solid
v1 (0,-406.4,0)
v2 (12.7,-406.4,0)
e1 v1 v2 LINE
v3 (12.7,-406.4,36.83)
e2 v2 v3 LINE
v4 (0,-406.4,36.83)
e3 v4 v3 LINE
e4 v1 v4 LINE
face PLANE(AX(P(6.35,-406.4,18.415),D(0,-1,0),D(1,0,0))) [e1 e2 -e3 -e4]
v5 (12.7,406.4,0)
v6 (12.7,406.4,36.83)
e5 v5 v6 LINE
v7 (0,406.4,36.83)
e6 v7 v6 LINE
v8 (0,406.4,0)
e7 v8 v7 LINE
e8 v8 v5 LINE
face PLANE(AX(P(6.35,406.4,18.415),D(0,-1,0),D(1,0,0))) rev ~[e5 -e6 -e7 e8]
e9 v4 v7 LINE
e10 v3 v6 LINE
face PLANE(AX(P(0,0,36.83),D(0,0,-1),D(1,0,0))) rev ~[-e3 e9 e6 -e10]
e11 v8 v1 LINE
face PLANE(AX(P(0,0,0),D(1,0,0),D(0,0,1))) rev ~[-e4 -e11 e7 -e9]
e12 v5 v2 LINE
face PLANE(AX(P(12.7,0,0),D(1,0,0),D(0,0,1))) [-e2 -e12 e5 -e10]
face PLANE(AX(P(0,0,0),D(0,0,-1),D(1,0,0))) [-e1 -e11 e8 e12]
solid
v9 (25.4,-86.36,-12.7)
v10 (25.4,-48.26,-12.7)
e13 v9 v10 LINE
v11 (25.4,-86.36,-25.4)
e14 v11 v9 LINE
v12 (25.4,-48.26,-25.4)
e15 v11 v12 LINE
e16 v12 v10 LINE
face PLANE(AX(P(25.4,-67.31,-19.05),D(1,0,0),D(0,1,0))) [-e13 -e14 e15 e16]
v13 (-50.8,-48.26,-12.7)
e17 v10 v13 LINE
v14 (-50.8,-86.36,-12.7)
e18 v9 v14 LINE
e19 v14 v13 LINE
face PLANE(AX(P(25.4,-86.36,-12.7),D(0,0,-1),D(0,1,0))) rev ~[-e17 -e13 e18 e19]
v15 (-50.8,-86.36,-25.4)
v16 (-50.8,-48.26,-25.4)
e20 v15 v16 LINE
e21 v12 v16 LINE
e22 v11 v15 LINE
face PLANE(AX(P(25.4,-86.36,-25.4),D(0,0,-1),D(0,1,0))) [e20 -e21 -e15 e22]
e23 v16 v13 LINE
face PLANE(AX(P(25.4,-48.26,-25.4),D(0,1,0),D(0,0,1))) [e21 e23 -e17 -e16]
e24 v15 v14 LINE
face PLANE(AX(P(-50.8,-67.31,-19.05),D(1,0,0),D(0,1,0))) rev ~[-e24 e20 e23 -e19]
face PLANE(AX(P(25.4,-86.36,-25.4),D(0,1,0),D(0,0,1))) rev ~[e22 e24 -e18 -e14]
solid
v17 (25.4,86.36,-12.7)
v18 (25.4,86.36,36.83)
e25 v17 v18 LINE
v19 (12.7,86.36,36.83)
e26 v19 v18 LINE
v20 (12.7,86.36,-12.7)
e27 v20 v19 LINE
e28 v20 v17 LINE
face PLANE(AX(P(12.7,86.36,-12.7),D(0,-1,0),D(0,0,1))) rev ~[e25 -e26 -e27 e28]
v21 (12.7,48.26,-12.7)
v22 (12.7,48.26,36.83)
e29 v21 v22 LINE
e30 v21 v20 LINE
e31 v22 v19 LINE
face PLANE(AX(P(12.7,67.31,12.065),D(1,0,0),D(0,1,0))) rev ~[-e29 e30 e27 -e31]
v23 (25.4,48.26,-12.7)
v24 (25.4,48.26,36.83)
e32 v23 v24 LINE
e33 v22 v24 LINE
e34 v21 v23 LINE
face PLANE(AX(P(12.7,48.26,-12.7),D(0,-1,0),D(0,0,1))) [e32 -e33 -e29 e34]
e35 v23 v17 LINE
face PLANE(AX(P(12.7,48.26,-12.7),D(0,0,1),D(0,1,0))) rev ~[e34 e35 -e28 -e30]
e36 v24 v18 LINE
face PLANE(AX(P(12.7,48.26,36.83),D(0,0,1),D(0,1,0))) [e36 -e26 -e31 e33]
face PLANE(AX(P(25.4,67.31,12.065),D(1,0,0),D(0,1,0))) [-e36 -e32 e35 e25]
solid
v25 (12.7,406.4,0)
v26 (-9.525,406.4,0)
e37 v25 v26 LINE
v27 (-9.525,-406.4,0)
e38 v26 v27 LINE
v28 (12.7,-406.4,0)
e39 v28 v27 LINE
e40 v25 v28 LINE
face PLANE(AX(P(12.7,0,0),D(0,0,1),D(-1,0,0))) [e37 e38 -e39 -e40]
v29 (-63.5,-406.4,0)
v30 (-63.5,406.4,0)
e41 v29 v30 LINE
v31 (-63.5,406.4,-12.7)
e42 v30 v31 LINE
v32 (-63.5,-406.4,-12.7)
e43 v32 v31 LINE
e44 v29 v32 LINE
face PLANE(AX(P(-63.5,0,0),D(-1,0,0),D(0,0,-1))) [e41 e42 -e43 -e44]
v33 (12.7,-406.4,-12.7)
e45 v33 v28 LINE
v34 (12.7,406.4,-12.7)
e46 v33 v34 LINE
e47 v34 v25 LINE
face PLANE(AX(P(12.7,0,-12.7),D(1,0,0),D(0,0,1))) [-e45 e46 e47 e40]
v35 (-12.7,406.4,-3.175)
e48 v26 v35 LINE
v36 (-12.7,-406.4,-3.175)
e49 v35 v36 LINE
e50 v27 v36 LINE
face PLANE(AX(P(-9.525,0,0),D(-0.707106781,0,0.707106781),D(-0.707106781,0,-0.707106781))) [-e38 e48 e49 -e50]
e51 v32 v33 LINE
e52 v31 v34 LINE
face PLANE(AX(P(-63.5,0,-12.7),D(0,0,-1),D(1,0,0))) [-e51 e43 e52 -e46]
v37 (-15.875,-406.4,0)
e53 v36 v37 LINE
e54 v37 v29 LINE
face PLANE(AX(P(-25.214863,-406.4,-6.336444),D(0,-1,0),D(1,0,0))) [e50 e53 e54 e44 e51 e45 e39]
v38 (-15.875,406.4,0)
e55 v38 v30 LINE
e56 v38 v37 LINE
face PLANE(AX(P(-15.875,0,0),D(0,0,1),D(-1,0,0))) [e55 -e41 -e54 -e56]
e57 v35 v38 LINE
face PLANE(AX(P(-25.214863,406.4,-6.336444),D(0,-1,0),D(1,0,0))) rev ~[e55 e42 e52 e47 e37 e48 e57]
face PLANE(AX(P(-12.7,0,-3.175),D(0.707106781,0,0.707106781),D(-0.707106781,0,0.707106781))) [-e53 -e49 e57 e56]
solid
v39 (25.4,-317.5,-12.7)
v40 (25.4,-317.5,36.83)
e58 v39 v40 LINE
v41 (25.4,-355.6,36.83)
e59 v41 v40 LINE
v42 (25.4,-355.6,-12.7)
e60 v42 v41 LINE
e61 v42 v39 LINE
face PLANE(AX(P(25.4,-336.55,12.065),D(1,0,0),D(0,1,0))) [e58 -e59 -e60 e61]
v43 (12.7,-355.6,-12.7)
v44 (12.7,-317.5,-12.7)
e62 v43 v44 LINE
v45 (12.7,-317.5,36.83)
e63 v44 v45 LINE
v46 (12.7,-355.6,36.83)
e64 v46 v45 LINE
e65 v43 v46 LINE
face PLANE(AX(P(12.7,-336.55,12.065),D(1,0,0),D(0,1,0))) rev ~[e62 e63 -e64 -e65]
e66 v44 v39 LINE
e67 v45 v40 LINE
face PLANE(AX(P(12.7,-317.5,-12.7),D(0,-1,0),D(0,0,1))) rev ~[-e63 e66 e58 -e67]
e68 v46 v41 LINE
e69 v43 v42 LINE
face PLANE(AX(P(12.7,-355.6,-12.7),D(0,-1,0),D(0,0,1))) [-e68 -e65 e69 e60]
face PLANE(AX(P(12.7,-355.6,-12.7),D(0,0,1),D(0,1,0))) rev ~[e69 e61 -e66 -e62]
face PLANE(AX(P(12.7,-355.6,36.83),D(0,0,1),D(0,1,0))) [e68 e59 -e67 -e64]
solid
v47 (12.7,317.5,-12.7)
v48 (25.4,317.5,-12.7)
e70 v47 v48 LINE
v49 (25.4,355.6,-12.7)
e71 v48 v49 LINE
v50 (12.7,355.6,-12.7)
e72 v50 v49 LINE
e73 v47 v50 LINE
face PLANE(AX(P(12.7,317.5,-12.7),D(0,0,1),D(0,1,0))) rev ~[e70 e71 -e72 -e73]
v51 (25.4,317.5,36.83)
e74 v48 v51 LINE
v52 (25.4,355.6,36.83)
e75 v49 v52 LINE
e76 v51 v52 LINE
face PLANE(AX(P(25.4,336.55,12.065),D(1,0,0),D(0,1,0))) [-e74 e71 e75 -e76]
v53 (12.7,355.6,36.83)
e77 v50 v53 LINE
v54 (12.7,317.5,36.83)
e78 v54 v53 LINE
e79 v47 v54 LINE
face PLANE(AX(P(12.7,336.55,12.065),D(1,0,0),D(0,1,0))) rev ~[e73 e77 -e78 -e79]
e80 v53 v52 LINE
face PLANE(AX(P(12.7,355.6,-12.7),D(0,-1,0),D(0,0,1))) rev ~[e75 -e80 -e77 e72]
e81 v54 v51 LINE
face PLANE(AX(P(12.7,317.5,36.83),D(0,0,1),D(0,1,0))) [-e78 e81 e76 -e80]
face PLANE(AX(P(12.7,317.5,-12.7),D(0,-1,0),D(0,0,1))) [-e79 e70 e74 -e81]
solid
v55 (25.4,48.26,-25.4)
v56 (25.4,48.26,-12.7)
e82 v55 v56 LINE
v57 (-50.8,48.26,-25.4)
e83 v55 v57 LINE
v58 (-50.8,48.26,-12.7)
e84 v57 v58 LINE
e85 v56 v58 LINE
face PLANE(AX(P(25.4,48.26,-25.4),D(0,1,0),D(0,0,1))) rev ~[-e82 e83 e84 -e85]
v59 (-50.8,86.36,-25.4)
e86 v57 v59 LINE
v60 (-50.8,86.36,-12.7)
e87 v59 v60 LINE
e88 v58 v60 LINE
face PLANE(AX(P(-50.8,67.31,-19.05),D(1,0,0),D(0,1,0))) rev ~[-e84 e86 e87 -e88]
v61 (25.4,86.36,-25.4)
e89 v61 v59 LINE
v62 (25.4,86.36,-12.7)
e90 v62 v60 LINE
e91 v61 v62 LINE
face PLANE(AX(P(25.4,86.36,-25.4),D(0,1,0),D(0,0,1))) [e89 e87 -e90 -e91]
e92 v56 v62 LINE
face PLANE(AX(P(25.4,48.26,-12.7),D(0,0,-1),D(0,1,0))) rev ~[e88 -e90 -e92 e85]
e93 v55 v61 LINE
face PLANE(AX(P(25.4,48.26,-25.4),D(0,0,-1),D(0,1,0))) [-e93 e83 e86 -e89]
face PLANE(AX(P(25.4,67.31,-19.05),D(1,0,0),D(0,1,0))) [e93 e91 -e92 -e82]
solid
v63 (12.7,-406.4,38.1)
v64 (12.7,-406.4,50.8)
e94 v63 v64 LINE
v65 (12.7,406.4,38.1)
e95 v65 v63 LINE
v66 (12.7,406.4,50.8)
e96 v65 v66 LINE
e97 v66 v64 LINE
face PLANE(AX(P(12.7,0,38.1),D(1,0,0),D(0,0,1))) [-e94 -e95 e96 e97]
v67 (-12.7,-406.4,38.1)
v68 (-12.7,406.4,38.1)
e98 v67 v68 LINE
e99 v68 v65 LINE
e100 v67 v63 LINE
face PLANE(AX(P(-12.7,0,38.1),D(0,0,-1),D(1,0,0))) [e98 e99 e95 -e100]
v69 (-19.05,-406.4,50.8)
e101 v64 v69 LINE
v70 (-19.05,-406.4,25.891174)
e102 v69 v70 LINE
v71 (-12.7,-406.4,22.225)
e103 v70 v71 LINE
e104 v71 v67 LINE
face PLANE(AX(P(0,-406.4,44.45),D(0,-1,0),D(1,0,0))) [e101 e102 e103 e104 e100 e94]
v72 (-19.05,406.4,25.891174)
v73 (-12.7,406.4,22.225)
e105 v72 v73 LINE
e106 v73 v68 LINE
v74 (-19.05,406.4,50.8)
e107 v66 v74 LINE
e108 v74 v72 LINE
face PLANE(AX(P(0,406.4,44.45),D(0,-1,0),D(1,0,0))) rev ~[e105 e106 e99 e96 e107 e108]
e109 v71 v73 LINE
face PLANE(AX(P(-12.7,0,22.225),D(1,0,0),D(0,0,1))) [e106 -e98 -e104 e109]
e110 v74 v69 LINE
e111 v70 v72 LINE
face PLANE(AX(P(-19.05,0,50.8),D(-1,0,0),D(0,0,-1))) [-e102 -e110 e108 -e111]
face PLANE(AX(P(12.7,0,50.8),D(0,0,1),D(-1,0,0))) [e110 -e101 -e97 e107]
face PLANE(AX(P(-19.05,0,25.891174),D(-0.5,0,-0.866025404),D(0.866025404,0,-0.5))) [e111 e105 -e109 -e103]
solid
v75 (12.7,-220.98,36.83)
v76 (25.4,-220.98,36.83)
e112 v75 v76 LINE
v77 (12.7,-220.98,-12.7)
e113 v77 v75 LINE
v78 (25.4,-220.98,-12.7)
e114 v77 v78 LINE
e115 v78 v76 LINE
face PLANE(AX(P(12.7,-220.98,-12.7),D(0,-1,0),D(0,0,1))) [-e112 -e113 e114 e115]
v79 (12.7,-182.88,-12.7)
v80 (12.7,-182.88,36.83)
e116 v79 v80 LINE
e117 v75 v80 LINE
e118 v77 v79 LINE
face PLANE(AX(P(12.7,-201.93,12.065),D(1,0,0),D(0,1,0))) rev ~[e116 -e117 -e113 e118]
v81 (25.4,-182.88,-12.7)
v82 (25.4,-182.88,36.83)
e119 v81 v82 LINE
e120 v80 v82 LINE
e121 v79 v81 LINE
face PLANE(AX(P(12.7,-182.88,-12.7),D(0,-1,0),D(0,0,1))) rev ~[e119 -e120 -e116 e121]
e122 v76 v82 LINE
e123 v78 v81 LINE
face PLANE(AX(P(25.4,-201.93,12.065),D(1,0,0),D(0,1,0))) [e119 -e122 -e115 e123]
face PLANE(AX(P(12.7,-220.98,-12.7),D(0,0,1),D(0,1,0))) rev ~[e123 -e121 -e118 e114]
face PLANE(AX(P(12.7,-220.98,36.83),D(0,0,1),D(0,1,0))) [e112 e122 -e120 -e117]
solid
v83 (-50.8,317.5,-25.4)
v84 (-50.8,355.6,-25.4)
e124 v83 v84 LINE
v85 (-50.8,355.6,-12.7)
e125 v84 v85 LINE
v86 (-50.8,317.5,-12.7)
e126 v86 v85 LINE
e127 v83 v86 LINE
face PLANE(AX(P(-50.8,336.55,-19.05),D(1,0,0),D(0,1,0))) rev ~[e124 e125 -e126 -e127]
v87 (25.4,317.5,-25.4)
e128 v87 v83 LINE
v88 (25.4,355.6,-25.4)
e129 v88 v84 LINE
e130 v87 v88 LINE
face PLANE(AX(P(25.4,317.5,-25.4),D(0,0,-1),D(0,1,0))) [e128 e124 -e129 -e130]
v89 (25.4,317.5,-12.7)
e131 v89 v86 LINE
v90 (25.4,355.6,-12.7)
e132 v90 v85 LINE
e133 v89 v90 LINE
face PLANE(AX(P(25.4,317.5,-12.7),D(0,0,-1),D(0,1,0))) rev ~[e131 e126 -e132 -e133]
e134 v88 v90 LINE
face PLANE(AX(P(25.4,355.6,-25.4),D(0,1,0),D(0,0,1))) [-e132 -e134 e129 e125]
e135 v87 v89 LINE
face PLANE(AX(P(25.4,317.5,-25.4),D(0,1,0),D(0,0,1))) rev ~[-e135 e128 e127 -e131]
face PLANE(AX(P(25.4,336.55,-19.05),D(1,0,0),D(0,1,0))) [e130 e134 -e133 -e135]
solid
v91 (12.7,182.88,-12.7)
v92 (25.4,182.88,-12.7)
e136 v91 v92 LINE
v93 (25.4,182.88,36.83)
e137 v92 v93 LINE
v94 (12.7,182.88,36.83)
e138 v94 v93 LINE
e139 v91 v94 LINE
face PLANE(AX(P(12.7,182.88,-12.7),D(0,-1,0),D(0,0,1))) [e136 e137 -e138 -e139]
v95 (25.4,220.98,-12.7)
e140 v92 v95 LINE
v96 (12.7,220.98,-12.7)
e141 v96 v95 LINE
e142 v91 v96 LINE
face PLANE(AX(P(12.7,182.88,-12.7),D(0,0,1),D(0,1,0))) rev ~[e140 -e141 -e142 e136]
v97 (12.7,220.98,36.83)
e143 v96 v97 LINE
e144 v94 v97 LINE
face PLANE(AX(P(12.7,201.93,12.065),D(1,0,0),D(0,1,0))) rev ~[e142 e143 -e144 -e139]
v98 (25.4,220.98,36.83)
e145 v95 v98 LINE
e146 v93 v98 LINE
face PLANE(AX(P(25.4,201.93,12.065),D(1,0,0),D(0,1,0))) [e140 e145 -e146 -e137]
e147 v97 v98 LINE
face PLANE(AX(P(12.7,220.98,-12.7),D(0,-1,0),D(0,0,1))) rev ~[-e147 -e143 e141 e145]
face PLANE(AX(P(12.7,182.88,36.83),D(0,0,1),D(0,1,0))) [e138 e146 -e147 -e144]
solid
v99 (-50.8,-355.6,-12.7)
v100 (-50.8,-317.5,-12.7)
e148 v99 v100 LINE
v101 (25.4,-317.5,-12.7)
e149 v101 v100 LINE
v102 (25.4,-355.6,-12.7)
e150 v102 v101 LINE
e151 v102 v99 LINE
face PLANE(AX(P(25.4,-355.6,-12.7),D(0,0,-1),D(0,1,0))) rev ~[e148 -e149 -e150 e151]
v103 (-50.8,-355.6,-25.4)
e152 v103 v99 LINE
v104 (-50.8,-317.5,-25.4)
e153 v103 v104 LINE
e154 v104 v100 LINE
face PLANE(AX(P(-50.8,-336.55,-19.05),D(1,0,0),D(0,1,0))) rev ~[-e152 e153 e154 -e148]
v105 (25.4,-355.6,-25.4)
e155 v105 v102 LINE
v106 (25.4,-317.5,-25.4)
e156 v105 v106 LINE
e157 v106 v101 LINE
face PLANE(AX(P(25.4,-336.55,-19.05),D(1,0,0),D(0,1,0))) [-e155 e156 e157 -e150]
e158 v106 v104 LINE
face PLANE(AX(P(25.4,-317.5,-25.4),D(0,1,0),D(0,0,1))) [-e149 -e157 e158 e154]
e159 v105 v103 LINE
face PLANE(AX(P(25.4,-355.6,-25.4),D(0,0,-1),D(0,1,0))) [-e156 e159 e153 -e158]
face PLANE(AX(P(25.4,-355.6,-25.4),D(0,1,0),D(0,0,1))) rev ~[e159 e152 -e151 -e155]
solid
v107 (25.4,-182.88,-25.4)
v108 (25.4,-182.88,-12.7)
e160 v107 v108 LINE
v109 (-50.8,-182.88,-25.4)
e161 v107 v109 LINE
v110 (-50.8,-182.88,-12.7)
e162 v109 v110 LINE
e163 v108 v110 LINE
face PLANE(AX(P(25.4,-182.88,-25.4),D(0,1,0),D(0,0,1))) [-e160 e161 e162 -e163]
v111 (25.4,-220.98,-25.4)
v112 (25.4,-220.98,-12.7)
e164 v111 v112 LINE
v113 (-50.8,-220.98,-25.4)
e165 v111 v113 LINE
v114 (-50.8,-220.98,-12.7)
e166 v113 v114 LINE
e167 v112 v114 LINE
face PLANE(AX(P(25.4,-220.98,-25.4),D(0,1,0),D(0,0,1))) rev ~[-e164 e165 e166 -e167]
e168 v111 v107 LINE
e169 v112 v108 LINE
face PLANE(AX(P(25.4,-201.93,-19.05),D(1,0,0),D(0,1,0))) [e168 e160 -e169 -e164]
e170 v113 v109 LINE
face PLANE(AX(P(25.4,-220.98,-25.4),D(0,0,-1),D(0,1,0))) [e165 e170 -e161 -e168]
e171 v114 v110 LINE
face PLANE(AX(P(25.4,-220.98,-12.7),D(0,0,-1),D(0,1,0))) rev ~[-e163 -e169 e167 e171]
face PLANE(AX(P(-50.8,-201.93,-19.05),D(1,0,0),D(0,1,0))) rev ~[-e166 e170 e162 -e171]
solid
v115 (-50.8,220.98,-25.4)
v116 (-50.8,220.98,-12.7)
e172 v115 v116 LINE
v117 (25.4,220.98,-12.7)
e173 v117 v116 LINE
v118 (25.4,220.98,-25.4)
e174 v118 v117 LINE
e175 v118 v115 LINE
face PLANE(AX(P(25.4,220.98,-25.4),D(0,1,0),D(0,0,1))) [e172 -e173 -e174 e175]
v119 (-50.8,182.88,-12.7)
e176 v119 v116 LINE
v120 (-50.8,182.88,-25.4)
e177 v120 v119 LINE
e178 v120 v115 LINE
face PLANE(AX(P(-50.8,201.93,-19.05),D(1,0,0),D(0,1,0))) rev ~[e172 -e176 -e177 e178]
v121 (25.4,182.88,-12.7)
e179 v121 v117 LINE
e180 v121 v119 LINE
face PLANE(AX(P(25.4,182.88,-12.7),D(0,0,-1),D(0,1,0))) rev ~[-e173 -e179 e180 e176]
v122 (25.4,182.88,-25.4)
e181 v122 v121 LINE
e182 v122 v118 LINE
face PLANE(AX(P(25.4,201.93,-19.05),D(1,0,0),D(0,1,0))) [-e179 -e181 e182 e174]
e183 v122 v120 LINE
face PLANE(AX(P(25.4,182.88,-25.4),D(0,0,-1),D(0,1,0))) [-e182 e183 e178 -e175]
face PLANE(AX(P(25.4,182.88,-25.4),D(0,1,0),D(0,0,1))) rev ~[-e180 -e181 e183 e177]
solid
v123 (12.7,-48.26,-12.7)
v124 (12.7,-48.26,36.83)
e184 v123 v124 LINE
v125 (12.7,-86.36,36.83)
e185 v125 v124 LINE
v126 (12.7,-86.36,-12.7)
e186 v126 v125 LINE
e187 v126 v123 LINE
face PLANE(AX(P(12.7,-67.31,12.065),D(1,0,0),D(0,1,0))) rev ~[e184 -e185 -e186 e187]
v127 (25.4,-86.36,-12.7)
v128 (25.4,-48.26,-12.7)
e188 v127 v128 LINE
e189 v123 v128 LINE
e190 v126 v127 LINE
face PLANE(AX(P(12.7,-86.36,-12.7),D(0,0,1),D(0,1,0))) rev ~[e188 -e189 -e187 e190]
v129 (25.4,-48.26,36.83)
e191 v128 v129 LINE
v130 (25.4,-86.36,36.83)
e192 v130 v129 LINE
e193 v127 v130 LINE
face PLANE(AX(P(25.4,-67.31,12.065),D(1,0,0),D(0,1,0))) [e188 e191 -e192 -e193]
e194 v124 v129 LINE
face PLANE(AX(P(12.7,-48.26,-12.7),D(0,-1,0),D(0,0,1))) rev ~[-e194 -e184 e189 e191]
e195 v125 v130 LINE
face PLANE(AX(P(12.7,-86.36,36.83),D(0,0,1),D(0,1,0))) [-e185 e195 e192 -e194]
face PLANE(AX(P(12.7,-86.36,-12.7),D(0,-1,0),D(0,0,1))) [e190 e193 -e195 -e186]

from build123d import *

# Parameters (mm, degrees)
F3_W      = 12.7
F3_H      = 36.83
F6_DEPTH  = 406.4
F7_DEPTH  = 406.4
F5_W      = 25.4
F5_H      = 12.7
F8_DEPTH  = 406.4
F9_W      = 38.1
F9_H      = 49.53
F10_DEPTH = 12.7
F11_W     = 38.1
F11_H     = 12.7
F12_DEPTH = 76.2


# Not quite as in the source:
# - a variable given as a bare number and used for a length is read in inches; the dataset says mm whatever the document's units were


with BuildPart() as f6:
    # F3 (on Front) → F6 (new body, symmetric)
    with BuildSketch(Plane.XZ):
        with Locations((6.35, 18.415)):
            Rectangle(F3_W, F3_H)
    extrude(amount=F6_DEPTH, both=True)


with BuildPart() as f7:
    # F4 (on Front) → F7 (new body, symmetric)
    with BuildSketch(Plane.XZ):
        Polygon((12.7, -12.7), (12.7, 0), (-9.525, 0), (-12.7, -3.175), (-15.875, 0), (-63.5, 0), (-63.5, -12.7), align=None)
    extrude(amount=F7_DEPTH, both=True)


with BuildPart() as f8:
    # F5 (on Front) → F8 (new body, symmetric)
    with BuildSketch(Plane.XZ):
        with Locations((0, 44.45)):
            Rectangle(F5_W, F5_H)
        Polygon((-12.7, 22.225), (-12.7, 38.1), (-12.7, 50.8), (-19.05, 50.8), (-19.05, 25.8911742094), align=None)
    extrude(amount=F8_DEPTH, both=True)


with BuildPart() as f10:
    # F9 (on face) → F10 (new body)
    with BuildSketch(Plane.YZ.offset(12.7)):
        with Locations((-336.55, 12.065)):
            Rectangle(F9_W, F9_H)
    extrude(amount=F10_DEPTH)


with BuildPart() as f10b:
    # F9 (on face) → F10, piece 2 (new body)
    with BuildSketch(Plane.YZ.offset(12.7)):
        with Locations((-201.93, 12.065)):
            Rectangle(F9_W, F9_H)
    extrude(amount=F10_DEPTH)


with BuildPart() as f10c:
    # F9 (on face) → F10, piece 3 (new body)
    with BuildSketch(Plane.YZ.offset(12.7)):
        with Locations((-67.31, 12.065)):
            Rectangle(F9_W, F9_H)
    extrude(amount=F10_DEPTH)


with BuildPart() as f10d:
    # F9 (on face) → F10, piece 4 (new body)
    with BuildSketch(Plane.YZ.offset(12.7)):
        with Locations((67.31, 12.065)):
            Rectangle(F9_W, F9_H)
    extrude(amount=F10_DEPTH)


with BuildPart() as f10e:
    # F9 (on face) → F10, piece 5 (new body)
    with BuildSketch(Plane.YZ.offset(12.7)):
        with Locations((201.93, 12.065)):
            Rectangle(F9_W, F9_H)
    extrude(amount=F10_DEPTH)


with BuildPart() as f10f:
    # F9 (on face) → F10, piece 6 (new body)
    with BuildSketch(Plane.YZ.offset(12.7)):
        with Locations((336.55, 12.065)):
            Rectangle(F9_W, F9_H)
    extrude(amount=F10_DEPTH)


with BuildPart() as f12:
    # F11 (on face) → F12 (new body)
    with BuildSketch(Plane.YZ.offset(25.4)):
        with Locations((-336.55, -19.05)):
            Rectangle(F11_W, F11_H)
    extrude(amount=-F12_DEPTH)


with BuildPart() as f12b:
    # F11 (on face) → F12, piece 2 (new body)
    with BuildSketch(Plane.YZ.offset(25.4)):
        with Locations((-201.93, -19.05)):
            Rectangle(F11_W, F11_H)
    extrude(amount=-F12_DEPTH)


with BuildPart() as f12c:
    # F11 (on face) → F12, piece 3 (new body)
    with BuildSketch(Plane.YZ.offset(25.4)):
        with Locations((-67.31, -19.05)):
            Rectangle(F11_W, F11_H)
    extrude(amount=-F12_DEPTH)


with BuildPart() as f12d:
    # F11 (on face) → F12, piece 4 (new body)
    with BuildSketch(Plane.YZ.offset(25.4)):
        with Locations((67.31, -19.05)):
            Rectangle(F11_W, F11_H)
    extrude(amount=-F12_DEPTH)


with BuildPart() as f12e:
    # F11 (on face) → F12, piece 5 (new body)
    with BuildSketch(Plane.YZ.offset(25.4)):
        with Locations((201.93, -19.05)):
            Rectangle(F11_W, F11_H)
    extrude(amount=-F12_DEPTH)


with BuildPart() as f12f:
    # F11 (on face) → F12, piece 6 (new body)
    with BuildSketch(Plane.YZ.offset(25.4)):
        with Locations((336.55, -19.05)):
            Rectangle(F11_W, F11_H)
    extrude(amount=-F12_DEPTH)


solid = Compound([f6.part, f7.part, f8.part, f10.part, f10b.part, f10c.part, f10d.part, f10e.part, f10f.part, f12.part, f12b.part, f12c.part, f12d.part, f12e.part, f12f.part])
